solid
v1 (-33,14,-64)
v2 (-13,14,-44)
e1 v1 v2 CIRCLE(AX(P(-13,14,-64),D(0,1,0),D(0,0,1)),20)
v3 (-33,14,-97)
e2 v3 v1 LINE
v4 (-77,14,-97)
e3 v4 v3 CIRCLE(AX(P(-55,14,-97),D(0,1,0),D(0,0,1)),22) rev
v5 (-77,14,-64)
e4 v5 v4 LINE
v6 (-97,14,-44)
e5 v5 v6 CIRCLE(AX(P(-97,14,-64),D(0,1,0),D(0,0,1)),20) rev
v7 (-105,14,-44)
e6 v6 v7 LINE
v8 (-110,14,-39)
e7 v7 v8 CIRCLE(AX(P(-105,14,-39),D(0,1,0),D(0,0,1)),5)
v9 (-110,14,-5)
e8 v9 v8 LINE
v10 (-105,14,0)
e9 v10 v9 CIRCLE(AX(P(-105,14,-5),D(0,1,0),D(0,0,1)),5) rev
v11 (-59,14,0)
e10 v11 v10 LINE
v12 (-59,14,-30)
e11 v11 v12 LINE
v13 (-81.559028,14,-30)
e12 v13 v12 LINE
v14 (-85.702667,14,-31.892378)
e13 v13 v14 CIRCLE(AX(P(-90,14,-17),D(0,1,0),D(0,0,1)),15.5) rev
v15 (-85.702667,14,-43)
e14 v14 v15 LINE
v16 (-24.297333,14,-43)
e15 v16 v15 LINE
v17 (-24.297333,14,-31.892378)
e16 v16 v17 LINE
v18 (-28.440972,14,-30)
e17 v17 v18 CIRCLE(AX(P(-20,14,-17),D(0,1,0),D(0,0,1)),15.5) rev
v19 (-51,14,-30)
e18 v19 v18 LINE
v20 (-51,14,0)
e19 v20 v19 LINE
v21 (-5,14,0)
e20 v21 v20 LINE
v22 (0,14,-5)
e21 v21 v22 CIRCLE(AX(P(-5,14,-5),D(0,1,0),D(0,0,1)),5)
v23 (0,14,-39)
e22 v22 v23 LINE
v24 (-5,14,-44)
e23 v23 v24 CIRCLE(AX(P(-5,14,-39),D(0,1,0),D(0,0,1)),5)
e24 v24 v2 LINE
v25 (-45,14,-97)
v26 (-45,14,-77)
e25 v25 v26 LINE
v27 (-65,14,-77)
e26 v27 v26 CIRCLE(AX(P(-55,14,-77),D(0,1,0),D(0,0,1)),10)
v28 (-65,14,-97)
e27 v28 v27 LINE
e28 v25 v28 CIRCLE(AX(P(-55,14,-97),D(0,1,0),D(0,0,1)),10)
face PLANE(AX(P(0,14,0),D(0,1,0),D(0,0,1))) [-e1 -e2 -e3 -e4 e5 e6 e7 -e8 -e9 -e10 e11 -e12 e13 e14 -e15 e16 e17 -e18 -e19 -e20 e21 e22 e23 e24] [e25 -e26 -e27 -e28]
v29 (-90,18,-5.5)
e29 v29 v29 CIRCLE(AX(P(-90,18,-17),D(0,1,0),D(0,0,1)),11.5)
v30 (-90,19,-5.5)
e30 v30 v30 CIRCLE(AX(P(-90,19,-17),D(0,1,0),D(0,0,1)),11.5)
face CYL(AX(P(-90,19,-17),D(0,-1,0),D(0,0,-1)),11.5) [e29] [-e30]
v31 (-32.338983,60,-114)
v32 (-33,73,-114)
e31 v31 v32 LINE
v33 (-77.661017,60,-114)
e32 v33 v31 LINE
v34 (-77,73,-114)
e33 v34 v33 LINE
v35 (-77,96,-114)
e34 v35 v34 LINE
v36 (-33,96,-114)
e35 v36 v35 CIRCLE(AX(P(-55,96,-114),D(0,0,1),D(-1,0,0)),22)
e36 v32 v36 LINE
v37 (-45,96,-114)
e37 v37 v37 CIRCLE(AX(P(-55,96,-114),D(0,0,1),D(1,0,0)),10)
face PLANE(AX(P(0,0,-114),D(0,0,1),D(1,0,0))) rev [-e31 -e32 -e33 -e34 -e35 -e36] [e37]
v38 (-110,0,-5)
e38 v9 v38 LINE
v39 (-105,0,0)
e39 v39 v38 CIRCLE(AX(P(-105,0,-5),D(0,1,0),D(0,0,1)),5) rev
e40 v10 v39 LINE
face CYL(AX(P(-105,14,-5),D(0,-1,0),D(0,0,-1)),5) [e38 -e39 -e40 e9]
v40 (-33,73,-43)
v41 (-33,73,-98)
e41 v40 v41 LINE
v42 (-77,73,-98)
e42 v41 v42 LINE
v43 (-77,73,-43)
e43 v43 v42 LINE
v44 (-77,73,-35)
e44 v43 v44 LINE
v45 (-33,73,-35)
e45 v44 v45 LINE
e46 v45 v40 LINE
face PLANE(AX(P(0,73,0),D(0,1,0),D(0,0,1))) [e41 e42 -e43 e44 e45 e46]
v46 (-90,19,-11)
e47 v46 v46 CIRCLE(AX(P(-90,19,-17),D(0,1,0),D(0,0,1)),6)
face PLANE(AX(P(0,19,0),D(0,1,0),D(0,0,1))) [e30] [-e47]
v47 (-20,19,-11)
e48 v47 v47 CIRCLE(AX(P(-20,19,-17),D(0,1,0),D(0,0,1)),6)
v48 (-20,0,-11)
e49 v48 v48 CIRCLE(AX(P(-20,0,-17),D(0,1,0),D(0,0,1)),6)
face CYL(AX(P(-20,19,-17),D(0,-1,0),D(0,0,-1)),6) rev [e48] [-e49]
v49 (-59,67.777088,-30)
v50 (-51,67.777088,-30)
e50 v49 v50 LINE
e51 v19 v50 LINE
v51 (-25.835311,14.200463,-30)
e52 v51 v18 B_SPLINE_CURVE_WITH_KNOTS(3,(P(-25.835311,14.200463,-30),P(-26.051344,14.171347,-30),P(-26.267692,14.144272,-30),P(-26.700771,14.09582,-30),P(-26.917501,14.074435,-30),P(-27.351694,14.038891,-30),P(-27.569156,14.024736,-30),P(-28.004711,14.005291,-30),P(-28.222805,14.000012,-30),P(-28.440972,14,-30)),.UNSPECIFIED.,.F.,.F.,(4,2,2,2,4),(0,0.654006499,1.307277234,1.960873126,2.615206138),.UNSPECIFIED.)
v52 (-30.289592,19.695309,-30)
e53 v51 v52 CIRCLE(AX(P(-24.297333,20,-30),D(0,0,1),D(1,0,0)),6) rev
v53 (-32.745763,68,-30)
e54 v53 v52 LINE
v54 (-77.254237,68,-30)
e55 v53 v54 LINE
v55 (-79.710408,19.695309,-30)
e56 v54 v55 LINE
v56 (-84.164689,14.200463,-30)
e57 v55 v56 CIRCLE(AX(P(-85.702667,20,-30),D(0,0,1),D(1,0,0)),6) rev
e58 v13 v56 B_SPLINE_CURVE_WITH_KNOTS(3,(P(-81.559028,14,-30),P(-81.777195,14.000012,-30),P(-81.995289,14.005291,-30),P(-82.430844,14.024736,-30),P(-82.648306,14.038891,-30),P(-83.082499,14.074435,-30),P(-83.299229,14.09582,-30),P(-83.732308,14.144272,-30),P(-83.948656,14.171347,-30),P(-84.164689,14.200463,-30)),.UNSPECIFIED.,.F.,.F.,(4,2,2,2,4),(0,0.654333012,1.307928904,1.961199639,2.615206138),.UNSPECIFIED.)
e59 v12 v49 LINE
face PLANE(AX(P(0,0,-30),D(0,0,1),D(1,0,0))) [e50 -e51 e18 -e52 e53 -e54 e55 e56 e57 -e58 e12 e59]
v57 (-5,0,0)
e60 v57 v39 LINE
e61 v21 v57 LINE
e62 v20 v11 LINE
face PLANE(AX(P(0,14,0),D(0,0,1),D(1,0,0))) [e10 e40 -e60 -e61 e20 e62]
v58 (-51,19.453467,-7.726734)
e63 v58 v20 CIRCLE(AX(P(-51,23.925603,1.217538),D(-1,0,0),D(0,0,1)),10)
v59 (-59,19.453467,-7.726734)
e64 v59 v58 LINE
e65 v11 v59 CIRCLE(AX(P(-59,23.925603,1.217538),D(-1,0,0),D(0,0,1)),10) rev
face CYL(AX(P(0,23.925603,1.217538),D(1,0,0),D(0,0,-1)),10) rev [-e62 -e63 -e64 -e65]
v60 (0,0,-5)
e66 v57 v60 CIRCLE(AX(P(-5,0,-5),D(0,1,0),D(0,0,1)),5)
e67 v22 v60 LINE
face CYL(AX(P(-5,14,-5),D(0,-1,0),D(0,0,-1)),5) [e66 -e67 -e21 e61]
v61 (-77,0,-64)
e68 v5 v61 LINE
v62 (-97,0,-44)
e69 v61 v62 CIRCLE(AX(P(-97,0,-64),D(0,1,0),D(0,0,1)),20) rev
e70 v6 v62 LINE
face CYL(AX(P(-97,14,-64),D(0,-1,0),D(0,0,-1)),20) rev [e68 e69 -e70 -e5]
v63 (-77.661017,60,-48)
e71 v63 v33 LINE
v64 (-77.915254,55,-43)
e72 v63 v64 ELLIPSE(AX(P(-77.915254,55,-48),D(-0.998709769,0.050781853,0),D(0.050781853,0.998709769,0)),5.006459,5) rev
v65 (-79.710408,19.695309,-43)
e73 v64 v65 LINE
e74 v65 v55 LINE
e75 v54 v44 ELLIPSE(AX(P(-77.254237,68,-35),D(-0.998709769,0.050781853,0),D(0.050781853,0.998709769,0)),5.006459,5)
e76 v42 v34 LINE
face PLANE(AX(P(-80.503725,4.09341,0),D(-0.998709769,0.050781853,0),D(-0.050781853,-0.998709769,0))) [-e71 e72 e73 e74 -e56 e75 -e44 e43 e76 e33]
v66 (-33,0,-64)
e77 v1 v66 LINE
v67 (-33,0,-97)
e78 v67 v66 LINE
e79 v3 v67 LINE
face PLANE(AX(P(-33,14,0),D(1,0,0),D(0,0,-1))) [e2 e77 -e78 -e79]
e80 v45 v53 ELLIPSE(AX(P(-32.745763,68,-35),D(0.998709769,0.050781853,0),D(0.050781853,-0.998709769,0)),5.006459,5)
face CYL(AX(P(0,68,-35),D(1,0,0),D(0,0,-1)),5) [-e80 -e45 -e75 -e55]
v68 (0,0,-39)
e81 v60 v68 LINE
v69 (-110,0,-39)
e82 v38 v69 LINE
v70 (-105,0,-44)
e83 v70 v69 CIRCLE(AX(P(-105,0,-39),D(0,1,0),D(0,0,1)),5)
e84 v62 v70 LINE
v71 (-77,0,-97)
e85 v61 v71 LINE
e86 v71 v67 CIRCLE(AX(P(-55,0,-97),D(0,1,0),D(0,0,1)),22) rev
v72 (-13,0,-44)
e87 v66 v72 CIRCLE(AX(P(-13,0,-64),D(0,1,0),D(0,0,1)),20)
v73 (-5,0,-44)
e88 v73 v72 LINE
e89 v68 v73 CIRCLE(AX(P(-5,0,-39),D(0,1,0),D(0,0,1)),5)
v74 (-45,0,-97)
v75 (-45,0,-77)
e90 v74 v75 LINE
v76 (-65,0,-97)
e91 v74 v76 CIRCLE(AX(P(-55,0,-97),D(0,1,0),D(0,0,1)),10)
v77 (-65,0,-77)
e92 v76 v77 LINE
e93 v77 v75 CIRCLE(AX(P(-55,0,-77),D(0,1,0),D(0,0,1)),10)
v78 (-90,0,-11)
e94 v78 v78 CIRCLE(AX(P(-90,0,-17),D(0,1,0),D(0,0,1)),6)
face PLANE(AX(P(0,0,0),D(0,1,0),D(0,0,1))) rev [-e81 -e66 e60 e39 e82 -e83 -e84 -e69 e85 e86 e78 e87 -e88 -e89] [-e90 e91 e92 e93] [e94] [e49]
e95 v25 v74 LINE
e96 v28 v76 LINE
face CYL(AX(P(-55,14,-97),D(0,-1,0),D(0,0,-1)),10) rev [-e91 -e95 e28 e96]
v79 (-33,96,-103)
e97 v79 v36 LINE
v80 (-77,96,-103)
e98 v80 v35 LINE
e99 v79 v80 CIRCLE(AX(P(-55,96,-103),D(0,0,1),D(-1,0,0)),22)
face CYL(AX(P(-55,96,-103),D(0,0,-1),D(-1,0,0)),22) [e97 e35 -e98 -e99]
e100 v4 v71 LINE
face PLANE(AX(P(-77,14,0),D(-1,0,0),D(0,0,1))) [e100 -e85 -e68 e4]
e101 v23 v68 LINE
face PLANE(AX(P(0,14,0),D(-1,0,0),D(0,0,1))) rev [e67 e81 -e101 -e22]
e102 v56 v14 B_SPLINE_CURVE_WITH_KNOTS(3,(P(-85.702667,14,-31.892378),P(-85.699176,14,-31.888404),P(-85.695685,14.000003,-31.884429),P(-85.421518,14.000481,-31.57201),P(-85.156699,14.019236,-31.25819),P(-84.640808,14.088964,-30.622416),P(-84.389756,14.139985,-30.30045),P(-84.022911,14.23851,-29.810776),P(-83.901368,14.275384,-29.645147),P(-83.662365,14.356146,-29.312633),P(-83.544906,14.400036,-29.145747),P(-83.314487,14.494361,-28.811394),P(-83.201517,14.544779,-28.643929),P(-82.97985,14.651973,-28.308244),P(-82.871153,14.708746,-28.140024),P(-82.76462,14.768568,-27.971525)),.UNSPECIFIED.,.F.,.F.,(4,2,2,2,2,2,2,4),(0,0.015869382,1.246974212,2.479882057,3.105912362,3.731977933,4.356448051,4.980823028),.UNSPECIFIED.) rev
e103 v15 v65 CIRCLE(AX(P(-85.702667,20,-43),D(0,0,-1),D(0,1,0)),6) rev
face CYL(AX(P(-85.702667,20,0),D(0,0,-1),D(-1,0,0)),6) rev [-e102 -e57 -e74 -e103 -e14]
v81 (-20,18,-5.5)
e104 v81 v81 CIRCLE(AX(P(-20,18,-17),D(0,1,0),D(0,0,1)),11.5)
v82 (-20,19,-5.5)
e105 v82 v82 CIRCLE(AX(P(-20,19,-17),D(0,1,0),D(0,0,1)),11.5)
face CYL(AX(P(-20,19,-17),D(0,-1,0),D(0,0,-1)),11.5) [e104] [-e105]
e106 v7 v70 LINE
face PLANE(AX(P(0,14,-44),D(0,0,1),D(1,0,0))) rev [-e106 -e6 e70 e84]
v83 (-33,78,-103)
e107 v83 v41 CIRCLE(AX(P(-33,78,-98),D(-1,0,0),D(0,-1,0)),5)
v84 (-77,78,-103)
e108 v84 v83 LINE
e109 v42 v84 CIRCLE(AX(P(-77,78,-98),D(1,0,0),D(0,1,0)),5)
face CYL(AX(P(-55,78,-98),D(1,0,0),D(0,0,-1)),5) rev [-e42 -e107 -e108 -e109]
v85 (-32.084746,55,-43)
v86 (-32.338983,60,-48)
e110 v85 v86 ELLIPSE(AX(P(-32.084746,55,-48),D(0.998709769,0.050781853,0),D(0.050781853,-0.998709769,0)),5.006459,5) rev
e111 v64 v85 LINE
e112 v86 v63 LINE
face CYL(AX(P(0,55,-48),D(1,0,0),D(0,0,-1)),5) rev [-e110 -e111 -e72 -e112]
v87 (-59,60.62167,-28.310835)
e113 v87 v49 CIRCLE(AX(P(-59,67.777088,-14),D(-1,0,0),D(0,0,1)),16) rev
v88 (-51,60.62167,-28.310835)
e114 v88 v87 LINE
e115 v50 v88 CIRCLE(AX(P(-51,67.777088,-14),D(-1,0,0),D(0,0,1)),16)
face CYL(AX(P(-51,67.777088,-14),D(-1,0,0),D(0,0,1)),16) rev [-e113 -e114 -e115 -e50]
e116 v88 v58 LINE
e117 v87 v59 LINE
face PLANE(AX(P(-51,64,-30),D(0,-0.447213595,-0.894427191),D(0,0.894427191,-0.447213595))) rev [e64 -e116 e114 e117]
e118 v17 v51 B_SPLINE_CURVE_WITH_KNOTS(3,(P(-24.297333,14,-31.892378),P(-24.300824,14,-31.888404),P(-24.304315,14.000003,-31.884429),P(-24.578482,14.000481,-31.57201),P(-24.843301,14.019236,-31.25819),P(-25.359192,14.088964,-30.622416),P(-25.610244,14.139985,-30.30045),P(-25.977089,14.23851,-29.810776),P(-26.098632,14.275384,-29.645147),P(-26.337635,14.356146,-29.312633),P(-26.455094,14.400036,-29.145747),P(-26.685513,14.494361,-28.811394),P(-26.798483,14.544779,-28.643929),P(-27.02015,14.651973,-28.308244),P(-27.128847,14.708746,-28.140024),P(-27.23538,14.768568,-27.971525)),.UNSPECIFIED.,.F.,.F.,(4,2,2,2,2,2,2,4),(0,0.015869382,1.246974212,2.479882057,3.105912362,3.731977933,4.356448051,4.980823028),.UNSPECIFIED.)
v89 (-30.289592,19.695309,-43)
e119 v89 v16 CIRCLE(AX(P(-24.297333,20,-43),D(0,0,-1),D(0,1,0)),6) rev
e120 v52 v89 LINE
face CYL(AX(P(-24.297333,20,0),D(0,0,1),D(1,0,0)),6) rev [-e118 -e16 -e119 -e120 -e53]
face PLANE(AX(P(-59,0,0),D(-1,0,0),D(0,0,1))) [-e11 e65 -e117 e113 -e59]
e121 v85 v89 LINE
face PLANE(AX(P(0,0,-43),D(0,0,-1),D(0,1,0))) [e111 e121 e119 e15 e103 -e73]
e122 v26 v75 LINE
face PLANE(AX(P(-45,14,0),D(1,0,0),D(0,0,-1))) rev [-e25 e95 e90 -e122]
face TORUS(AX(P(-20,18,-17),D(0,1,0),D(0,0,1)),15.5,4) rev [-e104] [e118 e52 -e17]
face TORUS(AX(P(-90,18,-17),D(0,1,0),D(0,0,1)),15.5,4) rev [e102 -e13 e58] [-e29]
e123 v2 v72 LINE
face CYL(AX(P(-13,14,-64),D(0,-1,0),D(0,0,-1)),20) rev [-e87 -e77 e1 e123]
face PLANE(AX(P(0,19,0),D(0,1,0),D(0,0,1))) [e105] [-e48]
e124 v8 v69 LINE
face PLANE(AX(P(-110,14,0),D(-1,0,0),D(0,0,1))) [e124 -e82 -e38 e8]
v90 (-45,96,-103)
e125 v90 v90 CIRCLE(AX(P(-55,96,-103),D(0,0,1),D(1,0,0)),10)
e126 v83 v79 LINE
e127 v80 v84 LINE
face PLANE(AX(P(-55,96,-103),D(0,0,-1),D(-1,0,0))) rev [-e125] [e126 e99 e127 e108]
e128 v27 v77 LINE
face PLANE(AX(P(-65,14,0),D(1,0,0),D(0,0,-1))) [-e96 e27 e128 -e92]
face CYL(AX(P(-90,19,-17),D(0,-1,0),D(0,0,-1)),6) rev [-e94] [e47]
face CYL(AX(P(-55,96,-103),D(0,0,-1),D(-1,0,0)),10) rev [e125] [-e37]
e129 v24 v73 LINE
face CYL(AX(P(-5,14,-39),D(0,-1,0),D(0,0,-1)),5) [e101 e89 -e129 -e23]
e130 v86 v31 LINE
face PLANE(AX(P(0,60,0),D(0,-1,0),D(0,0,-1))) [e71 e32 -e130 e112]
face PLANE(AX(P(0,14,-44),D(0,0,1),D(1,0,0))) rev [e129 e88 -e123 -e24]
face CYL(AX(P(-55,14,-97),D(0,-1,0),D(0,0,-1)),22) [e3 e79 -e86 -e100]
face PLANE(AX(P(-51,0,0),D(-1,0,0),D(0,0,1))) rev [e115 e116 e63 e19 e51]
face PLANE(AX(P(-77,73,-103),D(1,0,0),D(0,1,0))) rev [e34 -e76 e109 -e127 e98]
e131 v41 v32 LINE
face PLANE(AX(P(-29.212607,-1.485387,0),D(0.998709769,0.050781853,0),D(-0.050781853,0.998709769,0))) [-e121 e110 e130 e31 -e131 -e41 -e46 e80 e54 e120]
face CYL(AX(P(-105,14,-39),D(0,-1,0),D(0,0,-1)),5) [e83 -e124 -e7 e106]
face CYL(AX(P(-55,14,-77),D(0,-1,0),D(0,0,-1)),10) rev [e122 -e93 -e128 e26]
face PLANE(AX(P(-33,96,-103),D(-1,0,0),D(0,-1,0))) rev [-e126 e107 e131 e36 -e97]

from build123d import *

# Parameters (mm, degrees)
SKETCH1_R           = 11.5
BOSS_EXTRUDE1_DEPTH = 14
SKETCH1_3_R         = 11.5
SKETCH1_3_R_2       = 6
BOSS_EXTRUDE2_DEPTH = 19
BOSS_EXTRUDE3_DEPTH = 4
SKETCH8_R           = 10
BOSS_EXTRUDE4_DEPTH = 11
FILLET1_R           = 10
FILLET2_R           = 16
FILLET10_R          = 5
FILLET8_R           = 4
FILLET9_START       = -43
FILLET9_DEPTH       = 13


with BuildPart() as part:
    # Sketch1 → Boss-Extrude1 (new body)
    with BuildSketch(Plane(origin=(0, 0, 0), x_dir=(1, 0, 0), z_dir=(0, 1, 0))):
        with BuildLine():
            Line((-77, 64), (-77, 97))
            ThreePointArc((-77, 97), (-55, 119), (-33, 97))
            Line((-33, 97), (-33, 64))
            ThreePointArc((-33, 64), (-27.142135624, 49.857864376), (-13, 44))
            Line((-13, 44), (-5, 44))
            ThreePointArc((-5, 44), (-1.464466094, 42.535533906), (0, 39))
            Line((0, 39), (0, 5))
            ThreePointArc((0, 5), (-1.464466094, 1.464466094), (-5, 0))
            Line((-5, 0), (-105, 0))
            ThreePointArc((-105, 0), (-108.535533906, 1.464466094), (-110, 5))
            Line((-110, 5), (-110, 39))
            ThreePointArc((-110, 39), (-108.535533906, 42.535533906), (-105, 44))
            Line((-105, 44), (-97, 44))
            ThreePointArc((-97, 44), (-82.857864376, 49.857864376), (-77, 64))
        make_face()
        with Locations(Location((-20, 17, 0), (0, 0, 270))):
            Circle(SKETCH1_R, mode=Mode.SUBTRACT)
        with Locations(Location((-90, 17, 0), (0, 0, 270))):
            Circle(SKETCH1_R, mode=Mode.SUBTRACT)
        with BuildLine():
            Line((-45, 97), (-45, 77))
            ThreePointArc((-45, 77), (-55, 67), (-65, 77))
            Line((-65, 77), (-65, 97))
            ThreePointArc((-65, 97), (-55, 107), (-45, 97))
        make_face(mode=Mode.SUBTRACT)
    extrude(amount=BOSS_EXTRUDE1_DEPTH)

    # Sketch1<3> → Boss-Extrude2 (add)
    # profile 1 of 2: a face of its own
    with BuildSketch(Plane(origin=(0, 0, 0), x_dir=(1, 0, 0), z_dir=(0, 1, 0))):
        with Locations(Location((-90, 17, 0), (0, 0, 270))):
            Circle(SKETCH1_3_R)
        with Locations(Location((-90, 17, 0), (0, 0, 270))):
            Circle(SKETCH1_3_R_2, mode=Mode.SUBTRACT)
    # profile 2 of 2: a face of its own
    with BuildSketch(Plane(origin=(0, 0, 0), x_dir=(1, 0, 0), z_dir=(0, 1, 0))):
        with Locations(Location((-20, 17, 0), (0, 0, 270))):
            Circle(SKETCH1_3_R)
        with Locations(Location((-20, 17, 0), (0, 0, 270))):
            Circle(SKETCH1_3_R_2, mode=Mode.SUBTRACT)
    extrude(amount=BOSS_EXTRUDE2_DEPTH)

    # Sketch3 → Loft1 section 0
    with BuildSketch(Plane(origin=(0, 73, 0), x_dir=(1, 0, 0), z_dir=(0, 1, 0))):
        with BuildLine():
            Line((-77, 43), (-33, 43))
            Line((-33, 43), (-33, 30))
            Line((-33, 30), (-77, 30))
            Line((-77, 30), (-77, 43))
        make_face()
    # Sketch2 → Loft1 section 1
    with BuildSketch(Plane(origin=(0, 14, 0), x_dir=(1, 0, 0), z_dir=(0, 1, 0))):
        with BuildLine():
            Line((-80, 43), (-30, 43))
            Line((-30, 43), (-30, 30))
            Line((-30, 30), (-80, 30))
            Line((-80, 30), (-80, 43))
        make_face()
    loft()

    # Sketch4 → Boss-Extrude3 (add, symmetric)
    with BuildSketch(Plane(origin=(-55, 0, 0), x_dir=(0, 0, -1), z_dir=(1, 0, 0))):
        Polygon((30, 64), (5, 14), (30, 14), align=None)
    extrude(amount=BOSS_EXTRUDE3_DEPTH, both=True)

    # Sketch7 → Loft2 section 0
    with BuildSketch(Plane(origin=(0, 0, -43), x_dir=(-1, 0, 0), z_dir=(0, 0, -1))):
        with BuildLine():
            Line((77, 73), (77.661016949, 60))
            Line((77.661016949, 60), (32.338983051, 60))
            Line((32.338983051, 60), (33, 73))
            Line((33, 73), (77, 73))
        make_face()
    # Sketch6 → Loft2 section 1
    with BuildSketch(Plane.XY.offset(-114)):
        with BuildLine():
            Line((-77, 73), (-77.661016949, 60))
            Line((-77.661016949, 60), (-32.338983051, 60))
            Line((-32.338983051, 60), (-33, 73))
            Line((-33, 73), (-77, 73))
        make_face()
    loft()

    # Sketch8 → Boss-Extrude4 (add)
    with BuildSketch(Plane.XY.offset(-114)):
        with BuildLine():
            Line((-77, 73), (-77, 96))
            ThreePointArc((-77, 96), (-55, 118), (-33, 96))
            Line((-33, 96), (-33, 73))
            Line((-33, 73), (-77, 73))
        make_face()
        with Locations((-55, 96)):
            Circle(SKETCH8_R, mode=Mode.SUBTRACT)
    extrude(amount=BOSS_EXTRUDE4_DEPTH)

    # Fillet1
    # the kernel refuses this fillet: 10 mm, written as the material it adds along each edge
    with BuildSketch(Plane(origin=(-59, 14, -5), x_dir=(0, 0, 1), z_dir=(1, 0, 0))) as fillet1_piece_1:
        with BuildLine():
            CenterArc((6.217538244, -9.925603288), FILLET1_R, 96.993331588, 56.441617235)
            Line((-2.726733666, -5.453467333), (-2.905619105, -5.364024614))
            Line((-2.905619105, -5.364024614), (-0.178885438, 0.089442719))
            Line((-0.178885438, 0.089442719), (0, 0.2))
            ThreePointArc((0, 0.2), (2.5, 0.2), (4.975649235, 0.198512066))
            Line((4.975649235, 0.198512066), (5, 0))
        make_face()
    extrude(amount=8)

    # Fillet2
    fillet2_edges = [part.edges().sort_by_distance(p)[0] for p in [
        (-55, 64, -30),
    ]]
    fillet(fillet2_edges, radius=FILLET2_R)

    # Fillet10
    fillet10_edges = [part.edges().sort_by_distance(p)[0] for p in [
        (-55, 60, -43),
        (-55, 73, -103),
        (-55, 73, -30),
    ]]
    fillet(fillet10_edges, radius=FILLET10_R)

    # Fillet8
    fillet8_edges = [part.edges().sort_by_distance(p)[0] for p in [
        (-90, 14, -28.5),
        (-20, 14, -28.5),
    ]]
    fillet(fillet8_edges, radius=FILLET8_R)

    # Fillet9: read off the stored shape, not the designer's step
    # Fillet9 outline → Fillet9 (add)
    with BuildSketch(Plane.XY.offset(FILLET9_START)):
        with BuildLine():
            Line((-80, 14), (-79.710408023, 19.695308884))
            ThreePointArc((-79.710408023, 19.695308884), (-81.56915401, 15.650968689), (-85.702666639, 14))
            Line((-85.702666639, 14), (-80, 14))
        make_face()
        with BuildLine():
            Line((-30.289591977, 19.695308884), (-30, 14))
            Line((-30, 14), (-24.297333361, 14))
            ThreePointArc((-24.297333361, 14), (-28.43084599, 15.650968689), (-30.289591977, 19.695308884))
        make_face()
    extrude(amount=FILLET9_DEPTH)


solid = part.part
